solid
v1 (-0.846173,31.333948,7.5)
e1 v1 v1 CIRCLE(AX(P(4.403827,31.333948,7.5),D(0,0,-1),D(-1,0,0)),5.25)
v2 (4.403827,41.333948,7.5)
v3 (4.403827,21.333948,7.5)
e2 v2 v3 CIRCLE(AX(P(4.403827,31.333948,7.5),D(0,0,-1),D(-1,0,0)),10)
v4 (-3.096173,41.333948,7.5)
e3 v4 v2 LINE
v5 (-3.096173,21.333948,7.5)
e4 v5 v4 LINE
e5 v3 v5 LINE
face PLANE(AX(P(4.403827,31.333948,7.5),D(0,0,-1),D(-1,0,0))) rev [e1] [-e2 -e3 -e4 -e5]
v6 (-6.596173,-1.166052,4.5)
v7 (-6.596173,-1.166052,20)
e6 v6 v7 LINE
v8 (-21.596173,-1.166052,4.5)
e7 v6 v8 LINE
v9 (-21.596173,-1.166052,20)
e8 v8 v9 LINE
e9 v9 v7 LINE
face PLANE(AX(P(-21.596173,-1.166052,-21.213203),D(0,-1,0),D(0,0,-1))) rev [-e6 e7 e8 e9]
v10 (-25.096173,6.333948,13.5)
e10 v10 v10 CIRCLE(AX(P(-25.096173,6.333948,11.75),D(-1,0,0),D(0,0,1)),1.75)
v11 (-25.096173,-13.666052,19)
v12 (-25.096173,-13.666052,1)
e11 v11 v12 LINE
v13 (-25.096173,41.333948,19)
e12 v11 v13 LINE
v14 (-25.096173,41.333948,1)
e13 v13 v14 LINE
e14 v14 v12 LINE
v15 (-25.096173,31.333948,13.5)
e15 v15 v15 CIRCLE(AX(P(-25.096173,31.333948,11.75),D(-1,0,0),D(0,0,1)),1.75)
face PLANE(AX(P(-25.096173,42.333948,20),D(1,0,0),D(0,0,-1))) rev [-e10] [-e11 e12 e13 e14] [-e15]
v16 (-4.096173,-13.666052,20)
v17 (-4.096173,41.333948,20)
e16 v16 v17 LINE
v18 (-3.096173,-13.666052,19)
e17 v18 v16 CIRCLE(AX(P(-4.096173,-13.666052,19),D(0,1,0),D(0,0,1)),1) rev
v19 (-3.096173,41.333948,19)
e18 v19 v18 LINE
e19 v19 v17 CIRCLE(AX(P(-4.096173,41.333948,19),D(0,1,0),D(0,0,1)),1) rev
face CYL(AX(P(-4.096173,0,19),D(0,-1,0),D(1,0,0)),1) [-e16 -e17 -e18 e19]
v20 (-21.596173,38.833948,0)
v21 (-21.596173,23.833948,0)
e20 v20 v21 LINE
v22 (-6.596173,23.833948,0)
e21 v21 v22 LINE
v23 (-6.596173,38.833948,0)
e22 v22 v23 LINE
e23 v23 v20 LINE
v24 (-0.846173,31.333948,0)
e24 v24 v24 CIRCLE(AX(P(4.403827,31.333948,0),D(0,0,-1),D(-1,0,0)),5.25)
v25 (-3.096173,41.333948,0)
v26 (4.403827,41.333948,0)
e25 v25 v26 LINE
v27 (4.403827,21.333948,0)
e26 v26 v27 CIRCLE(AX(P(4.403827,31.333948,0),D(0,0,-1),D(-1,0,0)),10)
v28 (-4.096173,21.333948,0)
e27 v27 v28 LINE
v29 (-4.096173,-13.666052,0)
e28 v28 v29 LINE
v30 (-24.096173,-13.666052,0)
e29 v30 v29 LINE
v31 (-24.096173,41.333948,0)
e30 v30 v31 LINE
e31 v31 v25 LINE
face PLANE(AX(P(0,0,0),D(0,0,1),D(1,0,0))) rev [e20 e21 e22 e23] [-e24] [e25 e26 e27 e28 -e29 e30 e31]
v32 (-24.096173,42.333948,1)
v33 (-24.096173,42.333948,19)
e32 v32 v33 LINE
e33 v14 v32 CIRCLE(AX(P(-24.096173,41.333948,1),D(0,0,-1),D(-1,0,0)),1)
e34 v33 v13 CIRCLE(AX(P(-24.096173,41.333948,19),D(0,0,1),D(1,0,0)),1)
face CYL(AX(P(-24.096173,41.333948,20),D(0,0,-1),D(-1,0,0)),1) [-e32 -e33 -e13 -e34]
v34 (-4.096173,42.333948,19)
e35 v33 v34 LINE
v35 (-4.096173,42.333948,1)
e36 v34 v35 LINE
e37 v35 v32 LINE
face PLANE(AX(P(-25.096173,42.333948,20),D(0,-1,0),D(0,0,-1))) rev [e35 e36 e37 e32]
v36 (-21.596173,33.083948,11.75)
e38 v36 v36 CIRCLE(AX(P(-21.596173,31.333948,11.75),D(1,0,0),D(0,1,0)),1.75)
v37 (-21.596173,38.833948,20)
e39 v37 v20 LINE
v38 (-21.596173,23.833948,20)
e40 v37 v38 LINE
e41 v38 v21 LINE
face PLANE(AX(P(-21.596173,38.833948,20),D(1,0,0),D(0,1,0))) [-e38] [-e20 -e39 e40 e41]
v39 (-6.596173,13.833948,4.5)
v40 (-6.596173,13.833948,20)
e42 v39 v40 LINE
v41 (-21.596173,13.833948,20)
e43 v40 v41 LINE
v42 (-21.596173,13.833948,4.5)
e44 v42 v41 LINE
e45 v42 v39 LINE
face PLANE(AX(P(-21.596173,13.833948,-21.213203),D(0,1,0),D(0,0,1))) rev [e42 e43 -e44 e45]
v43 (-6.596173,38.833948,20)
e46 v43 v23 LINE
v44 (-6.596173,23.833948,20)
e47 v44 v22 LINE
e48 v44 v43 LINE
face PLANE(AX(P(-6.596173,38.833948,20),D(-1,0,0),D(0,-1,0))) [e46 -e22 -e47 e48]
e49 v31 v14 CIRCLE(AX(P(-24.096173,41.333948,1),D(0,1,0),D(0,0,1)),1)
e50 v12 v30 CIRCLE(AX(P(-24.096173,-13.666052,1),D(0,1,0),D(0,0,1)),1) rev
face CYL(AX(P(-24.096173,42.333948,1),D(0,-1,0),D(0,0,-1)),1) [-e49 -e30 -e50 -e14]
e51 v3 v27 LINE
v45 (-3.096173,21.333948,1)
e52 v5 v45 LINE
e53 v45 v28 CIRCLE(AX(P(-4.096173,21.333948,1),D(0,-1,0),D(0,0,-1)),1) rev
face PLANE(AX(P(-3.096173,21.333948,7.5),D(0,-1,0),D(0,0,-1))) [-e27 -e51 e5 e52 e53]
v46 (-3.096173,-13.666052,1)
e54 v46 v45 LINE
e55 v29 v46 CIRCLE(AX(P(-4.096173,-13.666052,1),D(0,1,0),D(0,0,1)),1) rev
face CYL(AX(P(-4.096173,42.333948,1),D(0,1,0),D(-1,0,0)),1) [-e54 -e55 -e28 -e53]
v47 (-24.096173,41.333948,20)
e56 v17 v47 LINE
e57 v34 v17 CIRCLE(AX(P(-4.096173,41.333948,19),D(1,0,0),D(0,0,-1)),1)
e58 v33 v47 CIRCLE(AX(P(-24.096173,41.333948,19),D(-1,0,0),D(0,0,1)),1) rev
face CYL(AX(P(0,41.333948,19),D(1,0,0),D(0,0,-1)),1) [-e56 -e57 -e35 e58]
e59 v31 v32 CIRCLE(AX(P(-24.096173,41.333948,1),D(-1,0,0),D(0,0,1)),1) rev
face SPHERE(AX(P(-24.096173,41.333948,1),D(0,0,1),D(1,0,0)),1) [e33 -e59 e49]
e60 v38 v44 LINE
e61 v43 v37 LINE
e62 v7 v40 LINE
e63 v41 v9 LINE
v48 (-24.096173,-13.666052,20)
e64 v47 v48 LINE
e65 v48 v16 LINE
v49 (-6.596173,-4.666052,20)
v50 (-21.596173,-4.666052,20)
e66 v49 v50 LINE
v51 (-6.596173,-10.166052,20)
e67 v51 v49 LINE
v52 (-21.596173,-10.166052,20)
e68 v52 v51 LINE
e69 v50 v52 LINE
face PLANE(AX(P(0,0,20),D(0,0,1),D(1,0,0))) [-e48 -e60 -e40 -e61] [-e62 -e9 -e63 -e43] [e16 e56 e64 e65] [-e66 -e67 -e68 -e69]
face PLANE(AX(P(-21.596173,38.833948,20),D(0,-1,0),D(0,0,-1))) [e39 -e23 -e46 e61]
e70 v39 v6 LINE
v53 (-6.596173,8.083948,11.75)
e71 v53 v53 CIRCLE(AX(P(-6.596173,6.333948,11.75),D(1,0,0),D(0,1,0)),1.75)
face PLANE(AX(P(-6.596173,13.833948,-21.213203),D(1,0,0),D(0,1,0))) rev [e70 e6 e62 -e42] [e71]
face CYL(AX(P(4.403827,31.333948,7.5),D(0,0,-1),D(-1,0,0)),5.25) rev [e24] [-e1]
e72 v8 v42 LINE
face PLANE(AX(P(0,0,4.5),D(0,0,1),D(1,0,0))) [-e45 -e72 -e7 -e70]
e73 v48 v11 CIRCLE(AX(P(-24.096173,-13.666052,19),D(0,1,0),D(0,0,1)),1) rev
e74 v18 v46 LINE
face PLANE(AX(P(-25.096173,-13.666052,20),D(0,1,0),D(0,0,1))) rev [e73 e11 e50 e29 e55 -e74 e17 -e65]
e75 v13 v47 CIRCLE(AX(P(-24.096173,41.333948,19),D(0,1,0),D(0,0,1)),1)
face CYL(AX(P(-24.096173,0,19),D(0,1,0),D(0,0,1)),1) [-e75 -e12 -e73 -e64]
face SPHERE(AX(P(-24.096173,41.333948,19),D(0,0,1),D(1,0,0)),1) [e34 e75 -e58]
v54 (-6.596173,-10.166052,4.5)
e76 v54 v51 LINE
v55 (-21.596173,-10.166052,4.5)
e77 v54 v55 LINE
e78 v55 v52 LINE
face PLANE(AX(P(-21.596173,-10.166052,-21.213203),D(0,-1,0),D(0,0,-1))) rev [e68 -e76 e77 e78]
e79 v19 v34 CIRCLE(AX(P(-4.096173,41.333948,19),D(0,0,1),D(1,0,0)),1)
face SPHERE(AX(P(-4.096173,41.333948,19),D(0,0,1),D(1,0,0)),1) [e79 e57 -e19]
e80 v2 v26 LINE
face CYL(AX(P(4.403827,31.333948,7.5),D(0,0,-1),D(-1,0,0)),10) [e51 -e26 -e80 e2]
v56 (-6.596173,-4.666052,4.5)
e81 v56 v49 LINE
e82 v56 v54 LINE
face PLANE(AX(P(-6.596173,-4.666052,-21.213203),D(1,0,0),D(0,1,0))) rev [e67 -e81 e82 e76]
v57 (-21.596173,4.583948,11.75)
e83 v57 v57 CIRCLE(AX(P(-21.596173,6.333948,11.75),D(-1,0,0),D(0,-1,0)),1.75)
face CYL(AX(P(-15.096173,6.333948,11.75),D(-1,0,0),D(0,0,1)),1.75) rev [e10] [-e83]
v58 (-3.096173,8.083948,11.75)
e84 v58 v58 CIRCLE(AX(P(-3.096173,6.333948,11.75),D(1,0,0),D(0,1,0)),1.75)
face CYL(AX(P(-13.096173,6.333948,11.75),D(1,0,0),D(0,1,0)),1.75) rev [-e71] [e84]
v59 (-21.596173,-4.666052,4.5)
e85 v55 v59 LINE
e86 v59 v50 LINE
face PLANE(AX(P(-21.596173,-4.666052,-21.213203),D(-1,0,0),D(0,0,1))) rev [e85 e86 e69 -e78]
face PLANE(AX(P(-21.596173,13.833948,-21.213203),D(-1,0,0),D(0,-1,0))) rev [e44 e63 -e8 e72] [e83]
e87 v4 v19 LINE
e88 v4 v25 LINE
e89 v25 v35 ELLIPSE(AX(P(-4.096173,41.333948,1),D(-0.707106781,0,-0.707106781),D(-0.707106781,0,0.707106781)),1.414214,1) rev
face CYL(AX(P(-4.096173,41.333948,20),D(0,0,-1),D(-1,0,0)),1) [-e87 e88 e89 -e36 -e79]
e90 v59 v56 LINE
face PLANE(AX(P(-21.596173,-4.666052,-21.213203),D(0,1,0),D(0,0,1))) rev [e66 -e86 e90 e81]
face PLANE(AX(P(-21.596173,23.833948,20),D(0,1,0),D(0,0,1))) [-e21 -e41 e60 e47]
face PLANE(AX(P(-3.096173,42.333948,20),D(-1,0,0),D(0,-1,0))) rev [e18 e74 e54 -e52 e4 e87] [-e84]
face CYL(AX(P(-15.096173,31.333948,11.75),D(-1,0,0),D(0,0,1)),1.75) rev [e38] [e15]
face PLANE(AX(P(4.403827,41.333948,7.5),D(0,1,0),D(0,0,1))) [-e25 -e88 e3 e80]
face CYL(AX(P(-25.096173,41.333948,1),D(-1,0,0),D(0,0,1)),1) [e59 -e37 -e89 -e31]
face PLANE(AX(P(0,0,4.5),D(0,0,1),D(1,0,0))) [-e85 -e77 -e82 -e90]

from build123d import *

# Parameters (mm, degrees)
SKETCH1_W           = 22
SKETCH1_H           = 56
SKETCH1_W_2         = 15
SKETCH1_H_2         = 15
BOSS_EXTRUDE1_DEPTH = 20
SKETCH2_W           = 15
SKETCH2_H           = 15
SKETCH2_H_2         = 5.5
CUT_EXTRUDE1_DEPTH  = 15.5
SKETCH4_R           = 5.25
BOSS_EXTRUDE3_DEPTH = 7.5
FILLET4_R           = 1
SKETCH6_R           = 1.75
CUT_EXTRUDE2_DEPTH  = 10
CUT_EXTRUDE3_START  = -10
SKETCH7_R           = 1.75
CUT_EXTRUDE3_DEPTH  = 10


with BuildPart() as part:
    # Sketch1 → Boss-Extrude1 (new body)
    with BuildSketch(Plane.XY):
        with Locations((-14.096172604, 14.333947726)):
            Rectangle(SKETCH1_W, SKETCH1_H)
        with Locations((-14.096172604, 31.333947726)):
            Rectangle(SKETCH1_W_2, SKETCH1_H_2, mode=Mode.SUBTRACT)
    extrude(amount=BOSS_EXTRUDE1_DEPTH)

    # Sketch2 → Cut-Extrude1 (cut)
    with BuildSketch(Plane.XY.offset(20)):
        with Locations((-14.096172604, 6.333947726)):
            Rectangle(SKETCH2_W, SKETCH2_H)
        with Locations((-14.096172604, -7.416052274)):
            Rectangle(SKETCH2_W, SKETCH2_H_2)
    extrude(amount=-CUT_EXTRUDE1_DEPTH, mode=Mode.SUBTRACT)

    # Sketch4 → Boss-Extrude3 (add)
    with BuildSketch(Plane(origin=(0, 0, 0), x_dir=(-1, 0, 0), z_dir=(0, 0, -1))):
        with BuildLine():
            Line((-4.403827396, 41.333947726), (3.096172604, 41.333947726))
            Line((3.096172604, 41.333947726), (3.096172604, 21.333947726))
            Line((3.096172604, 21.333947726), (-4.403827396, 21.333947726))
            ThreePointArc((-4.403827396, 21.333947726), (-14.403827396, 31.333947726), (-4.403827396, 41.333947726))
        make_face()
        with Locations((-4.403827396, 31.333947726)):
            Circle(SKETCH4_R, mode=Mode.SUBTRACT)
    extrude(amount=-BOSS_EXTRUDE3_DEPTH)

    # Fillet4
    fillet4_edges = [part.edges().sort_by_distance(p)[0] for p in [
        (-3.096172604, 14.333947726, 20),
        (-25.096172604, 14.333947726, 0),
        (-25.096172604, 14.333947726, 20),
        (-14.096172604, 42.333947726, 20),
        (-3.096172604, 42.333947726, 10),
        (-14.096172604, 42.333947726, 0),
        (-25.096172604, 42.333947726, 10),
        (-3.096172604, 3.833947726, 0),
    ]]
    fillet(fillet4_edges, radius=FILLET4_R - 0.0001)  # a hair under: the kernel refuses the full size

    # Sketch6 → Cut-Extrude2 (cut)
    with BuildSketch(Plane.ZY.offset(25.096172604)):
        with Locations((11.75, 31.333947726)):
            Circle(SKETCH6_R)
        with Locations((11.75, 6.333947726)):
            Circle(SKETCH6_R)
    extrude(amount=-CUT_EXTRUDE2_DEPTH, mode=Mode.SUBTRACT)

    # Sketch7 → Cut-Extrude3 (cut)
    with BuildSketch(Plane(origin=(-3.096172604, 0, 0), x_dir=(0, 0, -1), z_dir=(1, 0, 0)).offset(CUT_EXTRUDE3_START)):
        with Locations(Location((-11.75, 6.333947726, 0), (0, 0, 180))):
            Circle(SKETCH7_R)
    extrude(amount=CUT_EXTRUDE3_DEPTH, mode=Mode.SUBTRACT)


solid = part.part
